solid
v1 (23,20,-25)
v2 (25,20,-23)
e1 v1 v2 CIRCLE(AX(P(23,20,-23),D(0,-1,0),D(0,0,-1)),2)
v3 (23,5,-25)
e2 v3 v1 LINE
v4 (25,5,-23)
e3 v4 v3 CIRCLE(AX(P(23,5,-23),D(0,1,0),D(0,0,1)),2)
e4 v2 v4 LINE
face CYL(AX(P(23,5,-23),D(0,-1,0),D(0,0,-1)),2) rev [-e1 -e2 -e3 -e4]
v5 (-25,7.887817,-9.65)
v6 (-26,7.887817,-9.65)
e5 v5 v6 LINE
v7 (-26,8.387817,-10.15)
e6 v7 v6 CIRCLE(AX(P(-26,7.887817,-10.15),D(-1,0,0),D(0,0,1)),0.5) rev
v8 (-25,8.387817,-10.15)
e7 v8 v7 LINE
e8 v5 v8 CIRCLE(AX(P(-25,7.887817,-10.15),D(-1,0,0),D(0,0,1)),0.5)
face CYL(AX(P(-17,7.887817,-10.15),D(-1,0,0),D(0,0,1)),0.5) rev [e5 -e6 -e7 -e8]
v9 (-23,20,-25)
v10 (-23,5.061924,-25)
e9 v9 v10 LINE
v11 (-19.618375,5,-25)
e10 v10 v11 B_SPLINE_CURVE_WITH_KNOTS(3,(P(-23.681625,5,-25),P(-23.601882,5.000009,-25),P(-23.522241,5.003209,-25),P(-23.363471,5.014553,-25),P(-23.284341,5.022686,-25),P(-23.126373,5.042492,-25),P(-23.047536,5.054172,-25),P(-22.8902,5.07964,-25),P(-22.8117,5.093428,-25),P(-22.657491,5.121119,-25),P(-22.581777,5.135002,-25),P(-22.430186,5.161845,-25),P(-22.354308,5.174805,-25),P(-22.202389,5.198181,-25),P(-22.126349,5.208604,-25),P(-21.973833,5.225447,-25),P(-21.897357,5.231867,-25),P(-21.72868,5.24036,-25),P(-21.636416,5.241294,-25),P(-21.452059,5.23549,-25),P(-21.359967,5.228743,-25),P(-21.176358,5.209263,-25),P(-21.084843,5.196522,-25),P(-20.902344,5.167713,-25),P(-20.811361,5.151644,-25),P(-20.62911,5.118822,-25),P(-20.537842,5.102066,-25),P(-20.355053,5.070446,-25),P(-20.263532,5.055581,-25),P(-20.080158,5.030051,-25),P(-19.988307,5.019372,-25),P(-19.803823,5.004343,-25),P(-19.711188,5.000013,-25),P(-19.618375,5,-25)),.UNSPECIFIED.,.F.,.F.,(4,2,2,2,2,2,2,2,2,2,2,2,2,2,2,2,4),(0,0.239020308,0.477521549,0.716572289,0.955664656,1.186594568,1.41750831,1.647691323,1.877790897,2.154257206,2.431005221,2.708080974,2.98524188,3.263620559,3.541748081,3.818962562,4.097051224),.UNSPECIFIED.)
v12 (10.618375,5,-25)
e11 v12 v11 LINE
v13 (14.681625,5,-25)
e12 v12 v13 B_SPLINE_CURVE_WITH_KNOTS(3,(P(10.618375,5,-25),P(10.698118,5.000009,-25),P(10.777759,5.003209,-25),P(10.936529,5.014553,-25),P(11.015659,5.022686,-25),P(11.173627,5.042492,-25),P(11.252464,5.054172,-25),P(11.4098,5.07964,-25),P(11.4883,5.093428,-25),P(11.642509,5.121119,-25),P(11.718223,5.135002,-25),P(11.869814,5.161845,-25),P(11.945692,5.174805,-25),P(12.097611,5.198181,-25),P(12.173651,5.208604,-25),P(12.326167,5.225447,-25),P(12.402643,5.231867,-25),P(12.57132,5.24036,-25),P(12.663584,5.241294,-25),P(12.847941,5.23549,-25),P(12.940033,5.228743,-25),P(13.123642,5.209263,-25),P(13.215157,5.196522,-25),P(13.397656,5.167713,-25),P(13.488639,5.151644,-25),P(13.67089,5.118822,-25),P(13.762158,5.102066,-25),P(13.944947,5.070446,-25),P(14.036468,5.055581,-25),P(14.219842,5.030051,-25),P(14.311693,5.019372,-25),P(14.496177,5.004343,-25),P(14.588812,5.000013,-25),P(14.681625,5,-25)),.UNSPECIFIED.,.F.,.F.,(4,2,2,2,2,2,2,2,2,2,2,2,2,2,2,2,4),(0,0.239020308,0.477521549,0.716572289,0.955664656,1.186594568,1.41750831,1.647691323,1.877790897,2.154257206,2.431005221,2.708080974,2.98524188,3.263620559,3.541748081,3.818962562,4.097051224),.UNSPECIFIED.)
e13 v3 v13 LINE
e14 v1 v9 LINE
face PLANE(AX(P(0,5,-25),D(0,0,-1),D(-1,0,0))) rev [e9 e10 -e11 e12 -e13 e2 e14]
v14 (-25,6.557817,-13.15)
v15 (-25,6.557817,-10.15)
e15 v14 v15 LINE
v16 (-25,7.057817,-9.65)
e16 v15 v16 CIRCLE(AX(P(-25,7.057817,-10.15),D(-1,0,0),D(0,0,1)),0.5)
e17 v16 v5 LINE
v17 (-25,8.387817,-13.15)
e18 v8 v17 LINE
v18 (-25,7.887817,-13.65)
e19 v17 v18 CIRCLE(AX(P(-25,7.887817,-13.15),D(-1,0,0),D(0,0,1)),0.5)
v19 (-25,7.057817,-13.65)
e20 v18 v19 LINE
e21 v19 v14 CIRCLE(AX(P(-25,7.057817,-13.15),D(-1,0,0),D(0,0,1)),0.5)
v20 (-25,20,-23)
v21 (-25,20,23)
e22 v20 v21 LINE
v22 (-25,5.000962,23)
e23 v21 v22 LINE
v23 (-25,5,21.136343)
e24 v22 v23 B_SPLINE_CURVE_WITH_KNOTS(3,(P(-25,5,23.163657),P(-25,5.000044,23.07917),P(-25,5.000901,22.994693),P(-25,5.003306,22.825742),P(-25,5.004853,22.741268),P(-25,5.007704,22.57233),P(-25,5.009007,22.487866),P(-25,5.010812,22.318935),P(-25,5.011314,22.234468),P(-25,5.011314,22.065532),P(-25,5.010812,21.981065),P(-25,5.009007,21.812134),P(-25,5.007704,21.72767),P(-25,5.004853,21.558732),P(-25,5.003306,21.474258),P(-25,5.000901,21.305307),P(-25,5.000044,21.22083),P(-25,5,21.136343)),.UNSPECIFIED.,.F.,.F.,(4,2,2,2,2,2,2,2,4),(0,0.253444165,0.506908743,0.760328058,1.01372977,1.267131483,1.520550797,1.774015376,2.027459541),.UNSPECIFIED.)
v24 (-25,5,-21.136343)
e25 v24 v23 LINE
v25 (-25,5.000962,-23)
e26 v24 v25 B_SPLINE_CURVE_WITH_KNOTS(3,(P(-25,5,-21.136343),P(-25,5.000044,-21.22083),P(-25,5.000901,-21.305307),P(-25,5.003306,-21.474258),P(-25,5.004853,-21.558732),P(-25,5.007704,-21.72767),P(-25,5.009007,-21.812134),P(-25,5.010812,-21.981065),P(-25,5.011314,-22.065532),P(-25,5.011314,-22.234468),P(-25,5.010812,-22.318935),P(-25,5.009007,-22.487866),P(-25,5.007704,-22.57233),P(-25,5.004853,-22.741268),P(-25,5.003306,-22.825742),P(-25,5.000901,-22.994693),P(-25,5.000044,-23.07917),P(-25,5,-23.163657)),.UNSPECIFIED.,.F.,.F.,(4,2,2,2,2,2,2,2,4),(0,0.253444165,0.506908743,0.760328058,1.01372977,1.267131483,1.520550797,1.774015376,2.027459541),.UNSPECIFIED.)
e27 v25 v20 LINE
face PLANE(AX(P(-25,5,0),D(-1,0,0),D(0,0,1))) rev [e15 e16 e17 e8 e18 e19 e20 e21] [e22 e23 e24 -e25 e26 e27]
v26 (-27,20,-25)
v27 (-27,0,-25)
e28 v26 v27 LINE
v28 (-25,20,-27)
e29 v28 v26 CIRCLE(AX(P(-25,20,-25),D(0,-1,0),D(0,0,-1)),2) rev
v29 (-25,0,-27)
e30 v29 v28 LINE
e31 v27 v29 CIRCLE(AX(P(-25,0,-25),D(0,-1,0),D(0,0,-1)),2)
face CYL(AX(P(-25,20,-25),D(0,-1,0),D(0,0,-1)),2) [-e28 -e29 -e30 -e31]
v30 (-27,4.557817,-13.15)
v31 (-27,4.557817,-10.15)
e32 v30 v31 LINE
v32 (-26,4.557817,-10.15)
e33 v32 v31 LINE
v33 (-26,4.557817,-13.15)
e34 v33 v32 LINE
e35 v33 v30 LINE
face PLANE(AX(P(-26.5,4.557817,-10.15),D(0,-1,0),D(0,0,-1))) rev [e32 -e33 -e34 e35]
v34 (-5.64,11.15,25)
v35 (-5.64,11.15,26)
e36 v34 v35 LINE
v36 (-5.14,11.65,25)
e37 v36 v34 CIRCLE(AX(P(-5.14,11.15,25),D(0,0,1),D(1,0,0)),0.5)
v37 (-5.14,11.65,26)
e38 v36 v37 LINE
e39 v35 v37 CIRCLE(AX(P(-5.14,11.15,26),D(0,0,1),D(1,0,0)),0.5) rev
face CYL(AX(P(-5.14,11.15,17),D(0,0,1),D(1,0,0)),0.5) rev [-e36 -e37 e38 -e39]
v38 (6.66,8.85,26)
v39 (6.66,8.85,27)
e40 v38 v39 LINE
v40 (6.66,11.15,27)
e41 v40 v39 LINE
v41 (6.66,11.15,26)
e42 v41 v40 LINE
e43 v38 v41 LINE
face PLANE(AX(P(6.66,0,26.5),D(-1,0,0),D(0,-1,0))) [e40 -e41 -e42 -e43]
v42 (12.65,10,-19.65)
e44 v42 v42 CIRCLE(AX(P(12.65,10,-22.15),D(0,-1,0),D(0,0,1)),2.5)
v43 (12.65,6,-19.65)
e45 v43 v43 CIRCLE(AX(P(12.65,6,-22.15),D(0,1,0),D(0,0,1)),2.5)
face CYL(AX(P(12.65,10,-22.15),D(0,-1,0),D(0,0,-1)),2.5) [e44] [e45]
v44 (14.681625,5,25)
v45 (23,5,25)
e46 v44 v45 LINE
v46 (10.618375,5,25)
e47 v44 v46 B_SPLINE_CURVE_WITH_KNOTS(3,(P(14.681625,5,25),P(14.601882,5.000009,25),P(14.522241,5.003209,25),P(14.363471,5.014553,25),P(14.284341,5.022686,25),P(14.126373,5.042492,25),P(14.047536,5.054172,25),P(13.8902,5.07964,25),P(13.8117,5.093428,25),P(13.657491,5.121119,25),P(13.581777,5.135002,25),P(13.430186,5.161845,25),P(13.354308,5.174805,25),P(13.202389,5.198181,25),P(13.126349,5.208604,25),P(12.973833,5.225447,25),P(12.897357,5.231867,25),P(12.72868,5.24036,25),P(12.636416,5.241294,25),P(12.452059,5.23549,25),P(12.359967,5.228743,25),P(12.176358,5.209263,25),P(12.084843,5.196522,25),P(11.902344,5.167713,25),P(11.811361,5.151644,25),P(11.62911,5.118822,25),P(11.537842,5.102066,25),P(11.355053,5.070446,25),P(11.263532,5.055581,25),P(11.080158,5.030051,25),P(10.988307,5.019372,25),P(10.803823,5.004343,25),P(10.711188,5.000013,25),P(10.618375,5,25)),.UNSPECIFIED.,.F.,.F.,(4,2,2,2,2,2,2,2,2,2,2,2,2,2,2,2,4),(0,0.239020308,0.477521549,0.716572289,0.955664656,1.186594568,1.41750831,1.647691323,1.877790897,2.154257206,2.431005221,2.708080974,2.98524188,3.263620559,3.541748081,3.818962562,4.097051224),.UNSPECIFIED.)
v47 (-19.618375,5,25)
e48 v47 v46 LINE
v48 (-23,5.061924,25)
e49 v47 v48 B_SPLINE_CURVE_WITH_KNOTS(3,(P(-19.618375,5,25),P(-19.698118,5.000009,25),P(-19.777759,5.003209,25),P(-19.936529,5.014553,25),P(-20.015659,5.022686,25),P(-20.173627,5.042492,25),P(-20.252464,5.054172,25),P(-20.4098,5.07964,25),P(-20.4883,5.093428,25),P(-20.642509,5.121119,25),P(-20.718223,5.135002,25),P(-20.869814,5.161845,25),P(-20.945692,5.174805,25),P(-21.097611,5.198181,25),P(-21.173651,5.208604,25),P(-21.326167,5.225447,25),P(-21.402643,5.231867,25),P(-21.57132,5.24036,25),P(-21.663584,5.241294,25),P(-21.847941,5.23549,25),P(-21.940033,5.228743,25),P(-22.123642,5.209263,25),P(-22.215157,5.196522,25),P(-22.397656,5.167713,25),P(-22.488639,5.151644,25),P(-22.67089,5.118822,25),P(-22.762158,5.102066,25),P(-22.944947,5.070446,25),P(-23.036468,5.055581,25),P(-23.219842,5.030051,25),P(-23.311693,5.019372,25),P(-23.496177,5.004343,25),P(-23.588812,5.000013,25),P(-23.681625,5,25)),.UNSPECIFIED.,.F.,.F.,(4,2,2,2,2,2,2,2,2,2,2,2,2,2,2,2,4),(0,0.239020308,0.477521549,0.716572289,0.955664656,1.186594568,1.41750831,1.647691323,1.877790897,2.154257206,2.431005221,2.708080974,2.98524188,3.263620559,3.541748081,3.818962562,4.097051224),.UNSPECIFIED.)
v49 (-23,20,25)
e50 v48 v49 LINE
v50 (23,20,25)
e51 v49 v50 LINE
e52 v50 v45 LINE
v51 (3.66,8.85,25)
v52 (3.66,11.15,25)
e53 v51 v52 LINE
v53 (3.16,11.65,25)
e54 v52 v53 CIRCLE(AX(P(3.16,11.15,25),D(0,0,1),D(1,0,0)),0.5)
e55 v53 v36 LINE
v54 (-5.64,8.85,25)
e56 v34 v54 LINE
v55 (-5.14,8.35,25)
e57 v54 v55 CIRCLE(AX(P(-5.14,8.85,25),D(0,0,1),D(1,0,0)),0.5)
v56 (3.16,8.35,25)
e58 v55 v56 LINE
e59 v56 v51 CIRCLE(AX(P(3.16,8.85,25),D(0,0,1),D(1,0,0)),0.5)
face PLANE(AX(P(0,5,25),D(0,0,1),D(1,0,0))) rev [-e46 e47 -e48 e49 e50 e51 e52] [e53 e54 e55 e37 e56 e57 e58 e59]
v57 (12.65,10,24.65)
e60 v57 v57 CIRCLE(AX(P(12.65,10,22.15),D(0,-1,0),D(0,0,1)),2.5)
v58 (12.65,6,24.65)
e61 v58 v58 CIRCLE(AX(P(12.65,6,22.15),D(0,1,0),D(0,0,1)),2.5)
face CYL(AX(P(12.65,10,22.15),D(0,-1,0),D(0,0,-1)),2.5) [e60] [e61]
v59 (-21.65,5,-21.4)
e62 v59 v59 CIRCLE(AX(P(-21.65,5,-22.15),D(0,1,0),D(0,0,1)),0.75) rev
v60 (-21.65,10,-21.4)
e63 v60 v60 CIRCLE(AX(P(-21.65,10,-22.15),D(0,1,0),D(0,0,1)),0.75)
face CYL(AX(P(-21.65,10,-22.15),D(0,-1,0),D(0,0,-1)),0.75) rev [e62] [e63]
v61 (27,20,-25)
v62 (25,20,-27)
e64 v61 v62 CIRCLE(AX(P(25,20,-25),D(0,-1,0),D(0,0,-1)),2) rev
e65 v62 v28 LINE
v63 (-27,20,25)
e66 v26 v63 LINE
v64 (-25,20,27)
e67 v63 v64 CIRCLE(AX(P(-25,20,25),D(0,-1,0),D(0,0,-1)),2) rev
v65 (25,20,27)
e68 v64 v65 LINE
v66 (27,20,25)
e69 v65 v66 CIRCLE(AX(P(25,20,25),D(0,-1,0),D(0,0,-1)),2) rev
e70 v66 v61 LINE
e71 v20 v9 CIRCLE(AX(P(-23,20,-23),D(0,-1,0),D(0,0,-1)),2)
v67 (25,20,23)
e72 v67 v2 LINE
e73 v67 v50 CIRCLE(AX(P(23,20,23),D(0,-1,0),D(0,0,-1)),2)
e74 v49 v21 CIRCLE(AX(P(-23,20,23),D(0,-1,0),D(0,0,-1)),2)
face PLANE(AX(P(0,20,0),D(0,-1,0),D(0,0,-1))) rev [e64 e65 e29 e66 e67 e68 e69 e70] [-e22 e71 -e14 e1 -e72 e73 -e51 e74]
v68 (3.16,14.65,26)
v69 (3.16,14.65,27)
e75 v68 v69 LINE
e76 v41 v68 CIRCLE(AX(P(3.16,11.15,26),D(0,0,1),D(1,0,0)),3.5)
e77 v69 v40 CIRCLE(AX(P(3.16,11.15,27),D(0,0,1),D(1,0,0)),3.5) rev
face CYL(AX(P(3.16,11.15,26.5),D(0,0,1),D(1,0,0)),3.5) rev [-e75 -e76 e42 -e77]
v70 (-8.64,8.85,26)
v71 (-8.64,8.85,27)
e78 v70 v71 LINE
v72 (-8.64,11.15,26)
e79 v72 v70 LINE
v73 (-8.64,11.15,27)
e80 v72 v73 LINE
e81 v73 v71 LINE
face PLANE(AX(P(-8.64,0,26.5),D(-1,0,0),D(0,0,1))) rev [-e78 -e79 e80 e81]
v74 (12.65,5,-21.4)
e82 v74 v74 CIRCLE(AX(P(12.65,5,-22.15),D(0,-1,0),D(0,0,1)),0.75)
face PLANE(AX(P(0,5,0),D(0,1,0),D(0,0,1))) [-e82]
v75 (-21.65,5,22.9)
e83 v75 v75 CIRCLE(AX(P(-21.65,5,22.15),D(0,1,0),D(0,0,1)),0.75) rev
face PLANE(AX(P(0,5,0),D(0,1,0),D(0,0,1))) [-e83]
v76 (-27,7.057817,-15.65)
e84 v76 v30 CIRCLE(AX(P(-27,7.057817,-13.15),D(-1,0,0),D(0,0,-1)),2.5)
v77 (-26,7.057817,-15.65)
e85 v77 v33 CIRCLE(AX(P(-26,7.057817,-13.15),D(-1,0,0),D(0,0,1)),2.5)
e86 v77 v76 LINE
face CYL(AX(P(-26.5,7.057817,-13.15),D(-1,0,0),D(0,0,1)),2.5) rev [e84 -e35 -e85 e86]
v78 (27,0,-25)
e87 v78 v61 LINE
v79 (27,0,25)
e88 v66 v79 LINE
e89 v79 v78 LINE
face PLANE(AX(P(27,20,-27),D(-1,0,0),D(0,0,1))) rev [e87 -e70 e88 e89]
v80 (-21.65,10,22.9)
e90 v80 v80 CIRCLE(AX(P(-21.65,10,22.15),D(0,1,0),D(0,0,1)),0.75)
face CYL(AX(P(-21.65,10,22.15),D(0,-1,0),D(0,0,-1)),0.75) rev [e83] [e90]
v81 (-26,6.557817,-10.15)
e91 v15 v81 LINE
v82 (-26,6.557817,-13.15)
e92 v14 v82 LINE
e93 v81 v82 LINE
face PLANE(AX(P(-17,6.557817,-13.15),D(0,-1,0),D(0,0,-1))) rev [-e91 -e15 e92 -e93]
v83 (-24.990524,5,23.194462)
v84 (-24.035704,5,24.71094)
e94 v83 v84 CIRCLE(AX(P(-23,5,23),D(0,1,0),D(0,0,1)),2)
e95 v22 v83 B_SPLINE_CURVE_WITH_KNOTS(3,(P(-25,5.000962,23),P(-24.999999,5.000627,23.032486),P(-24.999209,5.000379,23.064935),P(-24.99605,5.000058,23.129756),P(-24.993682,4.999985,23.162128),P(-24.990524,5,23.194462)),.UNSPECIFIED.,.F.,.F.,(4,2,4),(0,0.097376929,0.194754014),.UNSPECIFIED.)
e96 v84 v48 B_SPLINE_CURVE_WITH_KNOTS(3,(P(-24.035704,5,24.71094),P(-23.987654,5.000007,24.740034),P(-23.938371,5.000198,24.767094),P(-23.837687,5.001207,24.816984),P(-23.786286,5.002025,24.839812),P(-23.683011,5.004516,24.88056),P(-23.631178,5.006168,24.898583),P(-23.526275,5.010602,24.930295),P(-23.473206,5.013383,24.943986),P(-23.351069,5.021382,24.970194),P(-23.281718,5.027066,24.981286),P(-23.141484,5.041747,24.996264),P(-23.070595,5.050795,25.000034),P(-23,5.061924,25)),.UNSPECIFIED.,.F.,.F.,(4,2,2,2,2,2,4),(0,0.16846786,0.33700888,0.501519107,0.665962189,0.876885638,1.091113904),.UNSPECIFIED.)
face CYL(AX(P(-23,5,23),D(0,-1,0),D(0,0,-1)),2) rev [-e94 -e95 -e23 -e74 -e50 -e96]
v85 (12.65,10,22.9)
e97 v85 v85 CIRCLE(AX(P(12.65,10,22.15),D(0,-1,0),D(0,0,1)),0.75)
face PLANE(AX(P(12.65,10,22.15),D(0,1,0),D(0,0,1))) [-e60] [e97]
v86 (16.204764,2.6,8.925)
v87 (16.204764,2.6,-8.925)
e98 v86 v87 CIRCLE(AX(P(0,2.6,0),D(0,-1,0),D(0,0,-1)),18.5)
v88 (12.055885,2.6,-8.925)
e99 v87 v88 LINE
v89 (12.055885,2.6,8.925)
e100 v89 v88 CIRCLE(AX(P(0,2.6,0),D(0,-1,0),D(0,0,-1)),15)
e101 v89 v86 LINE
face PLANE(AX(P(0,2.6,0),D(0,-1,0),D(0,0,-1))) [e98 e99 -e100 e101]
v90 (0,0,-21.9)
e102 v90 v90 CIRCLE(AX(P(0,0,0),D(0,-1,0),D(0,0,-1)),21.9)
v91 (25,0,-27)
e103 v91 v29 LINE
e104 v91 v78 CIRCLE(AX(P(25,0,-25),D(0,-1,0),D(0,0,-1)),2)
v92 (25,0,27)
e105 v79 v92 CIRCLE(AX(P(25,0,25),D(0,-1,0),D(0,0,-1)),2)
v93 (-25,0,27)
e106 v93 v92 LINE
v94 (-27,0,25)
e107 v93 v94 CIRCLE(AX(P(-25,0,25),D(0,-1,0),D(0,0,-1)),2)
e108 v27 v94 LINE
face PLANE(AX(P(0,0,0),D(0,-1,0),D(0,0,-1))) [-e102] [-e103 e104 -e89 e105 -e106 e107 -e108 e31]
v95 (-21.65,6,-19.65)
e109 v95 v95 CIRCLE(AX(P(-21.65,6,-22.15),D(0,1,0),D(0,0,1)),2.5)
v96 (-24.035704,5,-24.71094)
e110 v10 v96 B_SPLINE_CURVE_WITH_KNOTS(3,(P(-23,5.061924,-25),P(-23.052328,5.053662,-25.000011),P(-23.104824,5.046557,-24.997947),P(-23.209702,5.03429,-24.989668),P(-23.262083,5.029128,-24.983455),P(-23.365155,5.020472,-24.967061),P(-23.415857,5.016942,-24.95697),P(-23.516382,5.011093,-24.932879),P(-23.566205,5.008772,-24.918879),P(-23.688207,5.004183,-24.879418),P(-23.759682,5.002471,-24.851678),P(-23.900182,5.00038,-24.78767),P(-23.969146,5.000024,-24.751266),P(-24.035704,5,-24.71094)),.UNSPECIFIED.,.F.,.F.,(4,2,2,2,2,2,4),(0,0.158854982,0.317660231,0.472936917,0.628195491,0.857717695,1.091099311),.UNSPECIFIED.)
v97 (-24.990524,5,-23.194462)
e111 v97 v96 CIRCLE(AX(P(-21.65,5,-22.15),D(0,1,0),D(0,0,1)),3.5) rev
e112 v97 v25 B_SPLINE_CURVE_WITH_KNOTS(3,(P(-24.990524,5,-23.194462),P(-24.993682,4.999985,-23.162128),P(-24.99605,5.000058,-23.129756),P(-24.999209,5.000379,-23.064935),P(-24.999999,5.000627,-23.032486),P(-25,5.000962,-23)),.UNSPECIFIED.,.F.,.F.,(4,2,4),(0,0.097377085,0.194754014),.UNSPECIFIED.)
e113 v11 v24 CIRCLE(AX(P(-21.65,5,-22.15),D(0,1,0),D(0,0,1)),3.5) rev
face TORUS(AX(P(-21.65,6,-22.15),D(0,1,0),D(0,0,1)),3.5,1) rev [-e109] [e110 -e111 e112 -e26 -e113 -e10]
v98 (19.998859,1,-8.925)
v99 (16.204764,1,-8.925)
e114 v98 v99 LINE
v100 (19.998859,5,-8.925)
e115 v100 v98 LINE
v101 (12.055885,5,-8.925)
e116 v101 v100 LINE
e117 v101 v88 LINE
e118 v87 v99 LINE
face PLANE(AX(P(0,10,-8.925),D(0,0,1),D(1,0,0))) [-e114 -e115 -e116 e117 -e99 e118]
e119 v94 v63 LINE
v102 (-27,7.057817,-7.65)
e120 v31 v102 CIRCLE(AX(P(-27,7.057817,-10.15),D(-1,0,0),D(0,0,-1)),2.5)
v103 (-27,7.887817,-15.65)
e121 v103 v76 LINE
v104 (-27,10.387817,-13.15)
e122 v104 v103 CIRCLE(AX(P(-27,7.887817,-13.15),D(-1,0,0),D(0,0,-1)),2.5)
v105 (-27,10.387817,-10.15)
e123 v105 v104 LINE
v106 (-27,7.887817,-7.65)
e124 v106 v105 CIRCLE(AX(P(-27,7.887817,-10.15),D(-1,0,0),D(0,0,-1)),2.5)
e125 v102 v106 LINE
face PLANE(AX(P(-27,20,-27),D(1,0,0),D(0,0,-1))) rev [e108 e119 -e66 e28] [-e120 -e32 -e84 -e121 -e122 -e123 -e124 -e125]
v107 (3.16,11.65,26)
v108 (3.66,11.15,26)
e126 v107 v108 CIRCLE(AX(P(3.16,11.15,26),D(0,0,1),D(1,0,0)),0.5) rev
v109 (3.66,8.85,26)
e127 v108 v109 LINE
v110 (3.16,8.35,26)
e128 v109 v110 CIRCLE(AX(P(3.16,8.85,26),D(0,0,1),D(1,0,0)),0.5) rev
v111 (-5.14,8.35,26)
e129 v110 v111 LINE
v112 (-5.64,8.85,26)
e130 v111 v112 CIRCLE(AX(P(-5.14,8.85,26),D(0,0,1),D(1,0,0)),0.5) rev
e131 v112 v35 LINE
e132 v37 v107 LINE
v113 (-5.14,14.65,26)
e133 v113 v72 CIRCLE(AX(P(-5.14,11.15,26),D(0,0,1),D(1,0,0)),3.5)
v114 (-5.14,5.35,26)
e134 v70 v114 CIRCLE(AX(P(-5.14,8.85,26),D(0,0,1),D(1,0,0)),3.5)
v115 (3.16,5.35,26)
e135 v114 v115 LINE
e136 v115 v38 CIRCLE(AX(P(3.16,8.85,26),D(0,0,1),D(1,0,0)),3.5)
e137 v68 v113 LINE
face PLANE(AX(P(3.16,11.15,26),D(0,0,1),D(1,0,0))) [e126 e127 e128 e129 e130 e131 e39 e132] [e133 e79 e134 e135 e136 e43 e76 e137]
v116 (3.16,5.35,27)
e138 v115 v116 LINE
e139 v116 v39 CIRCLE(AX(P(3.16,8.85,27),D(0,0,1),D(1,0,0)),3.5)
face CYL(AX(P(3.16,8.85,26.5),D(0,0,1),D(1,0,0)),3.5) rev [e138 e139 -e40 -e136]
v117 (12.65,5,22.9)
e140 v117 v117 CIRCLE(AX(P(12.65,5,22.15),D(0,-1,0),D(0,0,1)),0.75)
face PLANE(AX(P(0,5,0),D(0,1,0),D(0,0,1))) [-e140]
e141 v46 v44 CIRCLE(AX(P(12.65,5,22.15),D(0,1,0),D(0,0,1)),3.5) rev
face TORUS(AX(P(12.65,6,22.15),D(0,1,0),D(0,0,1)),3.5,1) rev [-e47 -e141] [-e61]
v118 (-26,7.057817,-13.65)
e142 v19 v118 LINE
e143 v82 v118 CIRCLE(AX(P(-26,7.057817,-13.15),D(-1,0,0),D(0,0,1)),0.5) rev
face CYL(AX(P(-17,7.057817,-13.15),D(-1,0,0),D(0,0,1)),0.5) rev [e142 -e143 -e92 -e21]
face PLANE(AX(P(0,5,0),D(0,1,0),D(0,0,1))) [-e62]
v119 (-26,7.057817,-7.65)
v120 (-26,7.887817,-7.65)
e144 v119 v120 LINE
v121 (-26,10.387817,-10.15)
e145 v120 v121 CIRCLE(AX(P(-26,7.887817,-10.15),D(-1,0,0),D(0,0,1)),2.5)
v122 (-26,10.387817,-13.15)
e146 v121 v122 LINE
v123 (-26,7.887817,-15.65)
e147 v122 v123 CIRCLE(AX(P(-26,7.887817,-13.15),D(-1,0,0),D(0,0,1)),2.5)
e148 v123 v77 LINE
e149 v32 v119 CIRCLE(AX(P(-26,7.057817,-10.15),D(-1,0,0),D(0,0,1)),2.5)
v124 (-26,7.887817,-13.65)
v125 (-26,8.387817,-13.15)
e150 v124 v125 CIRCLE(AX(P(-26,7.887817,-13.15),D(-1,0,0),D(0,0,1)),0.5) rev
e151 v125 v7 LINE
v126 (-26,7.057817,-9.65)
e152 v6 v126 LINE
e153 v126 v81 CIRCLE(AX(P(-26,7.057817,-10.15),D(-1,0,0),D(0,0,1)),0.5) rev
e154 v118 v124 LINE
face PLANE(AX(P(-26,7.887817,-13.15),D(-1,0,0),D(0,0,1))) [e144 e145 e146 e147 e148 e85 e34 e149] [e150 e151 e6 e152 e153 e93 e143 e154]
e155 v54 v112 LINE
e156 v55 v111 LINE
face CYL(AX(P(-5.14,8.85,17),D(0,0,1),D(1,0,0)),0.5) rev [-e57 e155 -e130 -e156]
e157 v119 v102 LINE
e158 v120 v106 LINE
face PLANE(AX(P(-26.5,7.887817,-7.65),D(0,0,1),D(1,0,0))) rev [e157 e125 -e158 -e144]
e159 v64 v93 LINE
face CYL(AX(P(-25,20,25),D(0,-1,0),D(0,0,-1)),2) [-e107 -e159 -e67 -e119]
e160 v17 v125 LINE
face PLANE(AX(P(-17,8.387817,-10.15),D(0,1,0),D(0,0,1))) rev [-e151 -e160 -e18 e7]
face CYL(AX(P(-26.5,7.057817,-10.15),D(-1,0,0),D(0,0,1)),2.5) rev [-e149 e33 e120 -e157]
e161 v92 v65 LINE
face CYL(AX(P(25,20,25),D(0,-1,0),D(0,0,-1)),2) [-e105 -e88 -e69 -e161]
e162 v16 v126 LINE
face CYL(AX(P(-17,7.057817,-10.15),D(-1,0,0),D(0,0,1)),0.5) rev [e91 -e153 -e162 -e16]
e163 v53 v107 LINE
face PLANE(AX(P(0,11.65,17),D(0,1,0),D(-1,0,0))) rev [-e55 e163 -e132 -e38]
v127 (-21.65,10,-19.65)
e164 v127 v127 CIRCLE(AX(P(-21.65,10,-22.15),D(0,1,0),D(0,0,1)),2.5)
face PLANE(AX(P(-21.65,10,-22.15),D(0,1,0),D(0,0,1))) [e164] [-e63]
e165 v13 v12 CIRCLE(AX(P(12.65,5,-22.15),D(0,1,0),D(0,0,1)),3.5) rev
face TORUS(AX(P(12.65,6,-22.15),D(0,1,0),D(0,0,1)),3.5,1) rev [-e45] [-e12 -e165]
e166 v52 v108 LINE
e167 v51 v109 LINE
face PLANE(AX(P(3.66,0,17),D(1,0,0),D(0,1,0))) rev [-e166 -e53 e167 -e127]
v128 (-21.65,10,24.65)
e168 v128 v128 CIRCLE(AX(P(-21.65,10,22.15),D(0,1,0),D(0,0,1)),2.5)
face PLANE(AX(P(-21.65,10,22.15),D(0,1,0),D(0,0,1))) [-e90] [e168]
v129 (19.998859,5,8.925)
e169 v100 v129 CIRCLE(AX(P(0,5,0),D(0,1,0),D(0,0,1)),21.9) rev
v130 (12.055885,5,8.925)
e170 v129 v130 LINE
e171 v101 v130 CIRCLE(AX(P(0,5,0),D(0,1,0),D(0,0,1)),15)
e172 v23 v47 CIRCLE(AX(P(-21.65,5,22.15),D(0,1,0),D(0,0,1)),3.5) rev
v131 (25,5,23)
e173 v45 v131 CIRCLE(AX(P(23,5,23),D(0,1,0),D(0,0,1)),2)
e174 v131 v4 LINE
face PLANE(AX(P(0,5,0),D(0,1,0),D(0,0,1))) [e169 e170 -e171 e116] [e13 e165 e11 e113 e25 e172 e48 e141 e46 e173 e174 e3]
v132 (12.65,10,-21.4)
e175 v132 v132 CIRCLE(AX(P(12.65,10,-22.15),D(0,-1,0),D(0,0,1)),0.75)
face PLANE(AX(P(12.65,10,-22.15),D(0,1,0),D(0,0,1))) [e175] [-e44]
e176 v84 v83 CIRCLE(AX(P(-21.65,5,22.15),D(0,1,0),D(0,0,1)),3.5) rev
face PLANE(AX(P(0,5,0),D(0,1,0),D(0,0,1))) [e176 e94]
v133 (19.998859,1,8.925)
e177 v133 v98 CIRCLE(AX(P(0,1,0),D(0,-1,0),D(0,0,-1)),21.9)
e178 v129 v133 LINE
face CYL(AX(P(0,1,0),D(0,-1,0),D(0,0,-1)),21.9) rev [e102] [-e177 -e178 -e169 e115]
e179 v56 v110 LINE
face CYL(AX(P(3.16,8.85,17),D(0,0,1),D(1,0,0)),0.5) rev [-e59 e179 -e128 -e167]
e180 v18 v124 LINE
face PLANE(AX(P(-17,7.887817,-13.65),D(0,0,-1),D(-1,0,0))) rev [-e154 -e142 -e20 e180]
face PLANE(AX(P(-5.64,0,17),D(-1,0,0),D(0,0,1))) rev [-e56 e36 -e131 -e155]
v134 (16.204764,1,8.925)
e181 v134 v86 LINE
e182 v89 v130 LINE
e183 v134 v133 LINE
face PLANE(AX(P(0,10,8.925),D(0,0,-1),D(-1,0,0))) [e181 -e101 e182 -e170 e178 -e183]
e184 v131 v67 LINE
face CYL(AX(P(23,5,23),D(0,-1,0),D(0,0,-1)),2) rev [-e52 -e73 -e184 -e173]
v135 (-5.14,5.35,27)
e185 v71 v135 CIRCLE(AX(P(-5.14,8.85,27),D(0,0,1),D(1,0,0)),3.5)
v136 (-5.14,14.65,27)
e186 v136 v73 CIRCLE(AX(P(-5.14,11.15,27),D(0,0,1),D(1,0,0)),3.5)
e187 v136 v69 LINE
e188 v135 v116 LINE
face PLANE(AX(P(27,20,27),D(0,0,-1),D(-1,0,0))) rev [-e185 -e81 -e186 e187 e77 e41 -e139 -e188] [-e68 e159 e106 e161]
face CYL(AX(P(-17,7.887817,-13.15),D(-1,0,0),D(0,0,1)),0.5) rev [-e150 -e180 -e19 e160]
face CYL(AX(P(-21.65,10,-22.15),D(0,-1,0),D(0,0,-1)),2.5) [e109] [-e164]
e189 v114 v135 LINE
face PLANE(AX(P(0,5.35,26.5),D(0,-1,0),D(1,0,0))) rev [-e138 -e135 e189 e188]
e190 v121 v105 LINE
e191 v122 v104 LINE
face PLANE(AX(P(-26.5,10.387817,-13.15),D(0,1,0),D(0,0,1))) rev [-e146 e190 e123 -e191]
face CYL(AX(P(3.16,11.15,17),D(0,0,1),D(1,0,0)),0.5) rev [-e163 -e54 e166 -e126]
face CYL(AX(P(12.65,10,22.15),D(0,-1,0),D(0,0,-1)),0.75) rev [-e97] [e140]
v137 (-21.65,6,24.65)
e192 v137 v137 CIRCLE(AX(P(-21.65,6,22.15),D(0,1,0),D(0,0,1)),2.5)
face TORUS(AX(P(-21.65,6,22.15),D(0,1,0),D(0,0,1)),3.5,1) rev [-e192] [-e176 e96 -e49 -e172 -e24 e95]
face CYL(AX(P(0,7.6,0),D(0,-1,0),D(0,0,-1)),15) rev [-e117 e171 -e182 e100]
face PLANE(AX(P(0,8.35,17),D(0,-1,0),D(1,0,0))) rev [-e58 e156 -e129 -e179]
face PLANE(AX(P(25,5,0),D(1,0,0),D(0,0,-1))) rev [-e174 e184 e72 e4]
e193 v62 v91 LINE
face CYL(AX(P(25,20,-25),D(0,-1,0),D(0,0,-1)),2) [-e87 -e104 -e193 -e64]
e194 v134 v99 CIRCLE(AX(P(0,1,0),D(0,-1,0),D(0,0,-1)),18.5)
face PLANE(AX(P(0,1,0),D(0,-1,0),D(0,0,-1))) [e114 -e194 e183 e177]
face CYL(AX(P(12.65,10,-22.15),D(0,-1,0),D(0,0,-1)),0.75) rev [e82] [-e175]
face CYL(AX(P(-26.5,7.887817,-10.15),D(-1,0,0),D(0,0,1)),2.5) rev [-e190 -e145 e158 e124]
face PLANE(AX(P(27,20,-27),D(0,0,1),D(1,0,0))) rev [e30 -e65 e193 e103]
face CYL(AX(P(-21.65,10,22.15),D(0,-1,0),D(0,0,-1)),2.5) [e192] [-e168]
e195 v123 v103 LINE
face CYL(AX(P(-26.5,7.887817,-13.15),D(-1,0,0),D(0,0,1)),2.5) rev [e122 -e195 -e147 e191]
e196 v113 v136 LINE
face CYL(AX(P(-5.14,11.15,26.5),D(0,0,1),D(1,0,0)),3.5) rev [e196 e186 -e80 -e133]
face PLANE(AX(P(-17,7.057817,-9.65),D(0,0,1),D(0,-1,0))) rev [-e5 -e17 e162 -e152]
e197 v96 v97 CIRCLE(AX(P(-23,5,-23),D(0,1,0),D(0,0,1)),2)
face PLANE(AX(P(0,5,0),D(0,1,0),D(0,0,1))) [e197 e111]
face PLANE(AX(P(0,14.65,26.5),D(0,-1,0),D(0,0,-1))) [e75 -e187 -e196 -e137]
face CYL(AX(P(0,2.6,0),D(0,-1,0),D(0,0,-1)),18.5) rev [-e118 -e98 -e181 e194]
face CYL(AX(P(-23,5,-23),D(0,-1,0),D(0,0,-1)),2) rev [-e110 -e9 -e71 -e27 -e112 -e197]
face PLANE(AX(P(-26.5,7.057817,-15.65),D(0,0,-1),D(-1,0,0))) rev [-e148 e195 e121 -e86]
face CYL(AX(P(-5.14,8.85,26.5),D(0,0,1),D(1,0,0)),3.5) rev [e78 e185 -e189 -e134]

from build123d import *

# Parameters (mm, degrees)
SKETCH_1_W             = 54
SKETCH_1_H             = 54
EXTRUDE_1_DEPTH        = 20
SKETCH_2_W             = 50
SKETCH_2_H             = 50
CUT_EXTRUDE_1_DEPTH    = 15
SKETCH_3_R             = 2.5
SKETCH_3_R_2           = 0.75
EXTRUDE_2_DEPTH        = 5
FILLET_1_R             = 1
FILLET_1_OF_MIRROR_2_R = 1
SKETCH_4_R             = 21.9
CUT_EXTRUDE_2_DEPTH    = 1
SKETCH_6_R             = 18.5
CUT_EXTRUDE_4_DEPTH    = 1.6
SKETCH_8_R             = 15
CUT_EXTRUDE_5_DEPTH    = 5
SKETCH_10_W            = 23.151685838
SKETCH_10_H            = 17.85
CUT_EXTRUDE_6_DEPTH    = 10
CUT_EXTRUDE_8_DEPTH    = 0.5
CUT_EXTRUDE_9_DEPTH    = 10
CUT_EXTRUDE_10_DEPTH   = 0.5
CUT_EXTRUDE_11_DEPTH   = 10
CUT_EXTRUDE_12_DEPTH   = 0.5
CUT_EXTRUDE_13_DEPTH   = 0.5
FILLET_5_R             = 2


with BuildPart() as part:
    # 草图1 → 凸台-拉伸1 (new body)
    with BuildSketch(Plane(origin=(0, 0, 0), x_dir=(1, 0, 0), z_dir=(0, 1, 0))):
        Rectangle(SKETCH_1_W, SKETCH_1_H)
    extrude(amount=EXTRUDE_1_DEPTH)

    # 草图2 → 切除-拉伸1 (cut)
    with BuildSketch(Plane(origin=(0, 20, 0), x_dir=(1, 0, 0), z_dir=(0, 1, 0))):
        Rectangle(SKETCH_2_W, SKETCH_2_H)
    extrude(amount=-CUT_EXTRUDE_1_DEPTH, mode=Mode.SUBTRACT)

    # 草图3 → 凸台-拉伸2 (add)
    # profile 1 of 2: a face of its own
    with BuildSketch(Plane(origin=(0, 5, 0), x_dir=(1, 0, 0), z_dir=(0, 1, 0))):
        with Locations(Location((-21.65, 22.15, 0), (0, 0, 270))):
            Circle(SKETCH_3_R)
        with Locations(Location((-21.65, 22.15, 0), (0, 0, 270))):
            Circle(SKETCH_3_R_2, mode=Mode.SUBTRACT)
    # profile 2 of 2: a face of its own
    with BuildSketch(Plane(origin=(0, 5, 0), x_dir=(1, 0, 0), z_dir=(0, 1, 0))):
        with Locations(Location((-21.65, -22.15, 0), (0, 0, 270))):
            Circle(SKETCH_3_R)
        with Locations(Location((-21.65, -22.15, 0), (0, 0, 270))):
            Circle(SKETCH_3_R_2, mode=Mode.SUBTRACT)
    extrude_2 = extrude(amount=EXTRUDE_2_DEPTH)

    # 圆角1
    # the kernel refuses this fillet: 1 mm, written as the material it adds along each edge
    with BuildSketch(Plane(origin=(-21.65, 5, -22.15), x_dir=(0, 0, 1), z_dir=(-1, 0, 0))) as fillet_1_piece_1:
        with BuildLine():
            CenterArc((2.5 + FILLET_1_R, FILLET_1_R), FILLET_1_R, 180, 90)
            Line((2.5, FILLET_1_R), (2.5, 0))
            Line((2.5, 0), (2.5 + FILLET_1_R, 0))
        make_face()
    revolve(axis=Axis((-21.65, 5, -22.15), (0, 1, 0)))
    with BuildSketch(Plane(origin=(-21.65, 5, 22.15), x_dir=(0, 0, 1), z_dir=(-1, 0, 0))) as fillet_1_piece_2:
        with BuildLine():
            CenterArc((2.5 + FILLET_1_R, FILLET_1_R), FILLET_1_R, 180, 90)
            Line((2.5, FILLET_1_R), (2.5, 0))
            Line((2.5, 0), (2.5 + FILLET_1_R, 0))
        make_face()
    revolve(axis=Axis((-21.65, 5, 22.15), (0, 1, 0)))

    # 镜向2: 凸台-拉伸2 across plane
    add(extrude_2.mirror(Plane(origin=(-4.5, 0, 0), x_dir=(0, 0, 1), z_dir=(1, 0, 0))))

    # 圆角1 of 镜向2
    # the kernel refuses this fillet: 1 mm, written as the material it adds along each edge
    with BuildSketch(Plane(origin=(12.65, 5, -22.15), x_dir=(0, 0, 1), z_dir=(1, 0, 0))) as fillet_1_of_mirror_2_piece_1:
        with BuildLine():
            CenterArc((2.5 + FILLET_1_OF_MIRROR_2_R, -FILLET_1_OF_MIRROR_2_R), FILLET_1_OF_MIRROR_2_R, 90, 90)
            Line((2.5, -FILLET_1_OF_MIRROR_2_R), (2.5, 0))
            Line((2.5, 0), (2.5 + FILLET_1_OF_MIRROR_2_R, 0))
        make_face()
    revolve(axis=Axis((12.65, 5, -22.15), (0, -1, 0)))
    with BuildSketch(Plane(origin=(12.65, 5, 22.15), x_dir=(0, 0, 1), z_dir=(1, 0, 0))) as fillet_1_of_mirror_2_piece_2:
        with BuildLine():
            CenterArc((2.5 + FILLET_1_OF_MIRROR_2_R, -FILLET_1_OF_MIRROR_2_R), FILLET_1_OF_MIRROR_2_R, 90, 90)
            Line((2.5, -FILLET_1_OF_MIRROR_2_R), (2.5, 0))
            Line((2.5, 0), (2.5 + FILLET_1_OF_MIRROR_2_R, 0))
        make_face()
    revolve(axis=Axis((12.65, 5, 22.15), (0, -1, 0)))

    # 草图4 → 切除-拉伸2 (cut)
    with BuildSketch(Plane(origin=(0, 0, 0), x_dir=(-1, 0, 0), z_dir=(0, -1, 0))):
        with Locations(Location((0, 0, 0), (0, 0, 90))):
            Circle(SKETCH_4_R)
    extrude(amount=-CUT_EXTRUDE_2_DEPTH, mode=Mode.SUBTRACT)

    # 草图6 → 切除-拉伸4 (cut)
    with BuildSketch(Plane.XZ.offset(-1)):
        with Locations(Location((0, 0, 0), (0, 0, 270))):
            Circle(SKETCH_6_R)
    extrude(amount=-CUT_EXTRUDE_4_DEPTH, mode=Mode.SUBTRACT)

    # 草图8 → 切除-拉伸5 (cut)
    with BuildSketch(Plane.XZ.offset(-2.6)):
        with Locations(Location((0, 0, 0), (0, 0, 270))):
            Circle(SKETCH_8_R)
    extrude(amount=-CUT_EXTRUDE_5_DEPTH, mode=Mode.SUBTRACT)

    # 草图10 → 切除-拉伸6 (cut)
    with BuildSketch(Plane.XZ):
        with BuildLine():
            Line((19.998859342, 8.925), (19.998859342, -8.925))
            ThreePointArc((19.998859342, -8.925), (21.419442332, -4.562618787), (21.9, 0))
            ThreePointArc((21.9, 0), (21.419442332, 4.562618787), (19.998859342, 8.925))
        make_face()
        with Locations((8.423016423, 0)):
            Rectangle(SKETCH_10_W, SKETCH_10_H)
    extrude(amount=-CUT_EXTRUDE_6_DEPTH, mode=Mode.SUBTRACT)

    # 草图11 → 切除-拉伸8 (cut)
    with BuildSketch(Plane.XY.offset(27)):
        with BuildLine():
            Line((-5.14, 14.65), (3.16, 14.65))
            ThreePointArc((3.16, 14.65), (5.634873734, 13.624873734), (6.66, 11.15))
            Line((6.66, 11.15), (6.66, 8.85))
            ThreePointArc((6.66, 8.85), (5.634873734, 6.375126266), (3.16, 5.35))
            Line((3.16, 5.35), (-5.14, 5.35))
            ThreePointArc((-5.14, 5.35), (-7.614873734, 6.375126266), (-8.64, 8.85))
            Line((-8.64, 8.85), (-8.64, 11.15))
            ThreePointArc((-8.64, 11.15), (-7.614873734, 13.624873734), (-5.14, 14.65))
        make_face()
        with BuildLine():
            Line((-5.14, 11.65), (3.16, 11.65))
            ThreePointArc((3.16, 11.65), (3.513553391, 11.503553391), (3.66, 11.15))
            Line((3.66, 11.15), (3.66, 8.85))
            ThreePointArc((3.66, 8.85), (3.513553391, 8.496446609), (3.16, 8.35))
            Line((3.16, 8.35), (-5.14, 8.35))
            ThreePointArc((-5.14, 8.35), (-5.493553391, 8.496446609), (-5.64, 8.85))
            Line((-5.64, 8.85), (-5.64, 11.15))
            ThreePointArc((-5.64, 11.15), (-5.493553391, 11.503553391), (-5.14, 11.65))
        make_face(mode=Mode.SUBTRACT)
    extrude(amount=-CUT_EXTRUDE_8_DEPTH, mode=Mode.SUBTRACT)

    # 草图13 → 切除-拉伸9 (cut)
    with BuildSketch(Plane.XY.offset(27)):
        with BuildLine():
            ThreePointArc((3.16, 8.35), (3.513553391, 8.496446609), (3.66, 8.85))
            Line((3.66, 8.85), (3.66, 11.15))
            ThreePointArc((3.66, 11.15), (3.513553391, 11.503553391), (3.16, 11.65))
            Line((3.16, 11.65), (-5.14, 11.65))
            ThreePointArc((-5.14, 11.65), (-5.493553391, 11.503553391), (-5.64, 11.15))
            Line((-5.64, 11.15), (-5.64, 8.85))
            ThreePointArc((-5.64, 8.85), (-5.493553391, 8.496446609), (-5.14, 8.35))
            Line((-5.14, 8.35), (3.16, 8.35))
        make_face()
    extrude(amount=-CUT_EXTRUDE_9_DEPTH, mode=Mode.SUBTRACT)

    # 草图14 → 切除-拉伸10 (cut)
    with BuildSketch(Plane.ZY.offset(27)):
        with BuildLine():
            Line((-13.15, 10.387816511), (-10.15, 10.387816511))
            ThreePointArc((-10.15, 10.387816511), (-8.382233047, 9.655583464), (-7.65, 7.887816511))
            Line((-7.65, 7.887816511), (-7.65, 7.057816511))
            ThreePointArc((-7.65, 7.057816511), (-8.382233047, 5.290049558), (-10.15, 4.557816511))
            Line((-10.15, 4.557816511), (-13.15, 4.557816511))
            ThreePointArc((-13.15, 4.557816511), (-14.917766953, 5.290049558), (-15.65, 7.057816511))
            Line((-15.65, 7.057816511), (-15.65, 7.887816511))
            ThreePointArc((-15.65, 7.887816511), (-14.917766953, 9.655583464), (-13.15, 10.387816511))
        make_face()
        with BuildLine():
            Line((-10.15, 6.557816511), (-13.15, 6.557816511))
            ThreePointArc((-13.15, 6.557816511), (-13.503553391, 6.704263121), (-13.65, 7.057816511))
            Line((-13.65, 7.057816511), (-13.65, 7.887816511))
            ThreePointArc((-13.65, 7.887816511), (-13.503553391, 8.241369902), (-13.15, 8.387816511))
            Line((-13.15, 8.387816511), (-10.15, 8.387816511))
            ThreePointArc((-10.15, 8.387816511), (-9.796446609, 8.241369902), (-9.65, 7.887816511))
            Line((-9.65, 7.887816511), (-9.65, 7.057816511))
            ThreePointArc((-9.65, 7.057816511), (-9.796446609, 6.704263121), (-10.15, 6.557816511))
        make_face(mode=Mode.SUBTRACT)
    extrude(amount=-CUT_EXTRUDE_10_DEPTH, mode=Mode.SUBTRACT)

    # 草图15 → 切除-拉伸11 (cut)
    with BuildSketch(Plane.ZY.offset(27)):
        with BuildLine():
            Line((-9.65, 7.057816511), (-9.65, 7.887816511))
            ThreePointArc((-9.65, 7.887816511), (-9.796446609, 8.241369902), (-10.15, 8.387816511))
            Line((-10.15, 8.387816511), (-13.15, 8.387816511))
            ThreePointArc((-13.15, 8.387816511), (-13.503553391, 8.241369902), (-13.65, 7.887816511))
            Line((-13.65, 7.887816511), (-13.65, 7.057816511))
            ThreePointArc((-13.65, 7.057816511), (-13.503553391, 6.704263121), (-13.15, 6.557816511))
            Line((-13.15, 6.557816511), (-10.15, 6.557816511))
            ThreePointArc((-10.15, 6.557816511), (-9.796446609, 6.704263121), (-9.65, 7.057816511))
        make_face()
    extrude(amount=-CUT_EXTRUDE_11_DEPTH, mode=Mode.SUBTRACT)

    # 草图17 → 切除-拉伸12 (cut)
    with BuildSketch(Plane.XY.offset(26.5)):
        with BuildLine():
            Line((3.16, 14.65), (-5.14, 14.65))
            ThreePointArc((-5.14, 14.65), (-7.614873734, 13.624873734), (-8.64, 11.15))
            Line((-8.64, 11.15), (-8.64, 8.85))
            ThreePointArc((-8.64, 8.85), (-7.614873734, 6.375126266), (-5.14, 5.35))
            Line((-5.14, 5.35), (3.16, 5.35))
            ThreePointArc((3.16, 5.35), (5.634873734, 6.375126266), (6.66, 8.85))
            Line((6.66, 8.85), (6.66, 11.15))
            ThreePointArc((6.66, 11.15), (5.634873734, 13.624873734), (3.16, 14.65))
        make_face()
    extrude(amount=-CUT_EXTRUDE_12_DEPTH, mode=Mode.SUBTRACT)

    # 草图18 → 切除-拉伸13 (cut)
    with BuildSketch(Plane.ZY.offset(26.5)):
        with BuildLine():
            Line((-15.65, 7.887816511), (-15.65, 7.057816511))
            ThreePointArc((-15.65, 7.057816511), (-14.917766953, 5.290049558), (-13.15, 4.557816511))
            Line((-13.15, 4.557816511), (-10.15, 4.557816511))
            ThreePointArc((-10.15, 4.557816511), (-8.382233047, 5.290049558), (-7.65, 7.057816511))
            Line((-7.65, 7.057816511), (-7.65, 7.887816511))
            ThreePointArc((-7.65, 7.887816511), (-8.382233047, 9.655583464), (-10.15, 10.387816511))
            Line((-10.15, 10.387816511), (-13.15, 10.387816511))
            ThreePointArc((-13.15, 10.387816511), (-14.917766953, 9.655583464), (-15.65, 7.887816511))
        make_face()
    extrude(amount=-CUT_EXTRUDE_13_DEPTH, mode=Mode.SUBTRACT)

    # 圆角5
    # the kernel refuses this fillet: 2 mm, written as the material it adds along each edge
    with BuildSketch(Plane(origin=(-25, 20, 25), x_dir=(0, 0, -1), z_dir=(0, -1, 0))) as fillet_5_piece_1:
        with BuildLine():
            CenterArc((FILLET_5_R, FILLET_5_R), FILLET_5_R, 180, 90)
            Line((0, FILLET_5_R), (0, 0))
            Line((0, 0), (FILLET_5_R, 0))
        make_face()
    extrude(amount=20)
    with BuildSketch(Plane(origin=(25, 20, 25), x_dir=(0, 0, -1), z_dir=(0, -1, 0)), Plane(origin=(25, 20, -25), x_dir=(-1, 0, 0), z_dir=(0, -1, 0)), Plane(origin=(-25, 20, -25), x_dir=(0, 0, 1), z_dir=(0, -1, 0))) as fillet_5_piece_2:
        with BuildLine():
            CenterArc((FILLET_5_R, -FILLET_5_R), FILLET_5_R, 90, 90)
            Line((0, -FILLET_5_R), (0, 0))
            Line((0, 0), (FILLET_5_R, 0))
        make_face()
    extrude(amount=20)
    # the kernel refuses this fillet: 2 mm, written as the material it takes off along each edge
    with BuildSketch(Plane(origin=(-27, -5, 27), x_dir=(0, 0, -1), z_dir=(0, 1, 0)), Plane(origin=(-27, -5, -27), x_dir=(1, 0, 0), z_dir=(0, 1, 0))) as fillet_5_2_piece_1:
        with BuildLine():
            CenterArc((FILLET_5_R, -FILLET_5_R), FILLET_5_R, 90, 90)
            Line((0, -FILLET_5_R), (0, 0))
            Line((0, 0), (FILLET_5_R, 0))
        make_face()
    extrude(amount=30, mode=Mode.SUBTRACT)
    with BuildSketch(Plane(origin=(27, -5, 27), x_dir=(0, 0, -1), z_dir=(0, 1, 0)), Plane(origin=(27, -5, -27), x_dir=(-1, 0, 0), z_dir=(0, 1, 0))) as fillet_5_2_piece_2:
        with BuildLine():
            CenterArc((FILLET_5_R, FILLET_5_R), FILLET_5_R, 180, 90)
            Line((0, FILLET_5_R), (0, 0))
            Line((0, 0), (FILLET_5_R, 0))
        make_face()
    extrude(amount=30, mode=Mode.SUBTRACT)


solid = part.part
